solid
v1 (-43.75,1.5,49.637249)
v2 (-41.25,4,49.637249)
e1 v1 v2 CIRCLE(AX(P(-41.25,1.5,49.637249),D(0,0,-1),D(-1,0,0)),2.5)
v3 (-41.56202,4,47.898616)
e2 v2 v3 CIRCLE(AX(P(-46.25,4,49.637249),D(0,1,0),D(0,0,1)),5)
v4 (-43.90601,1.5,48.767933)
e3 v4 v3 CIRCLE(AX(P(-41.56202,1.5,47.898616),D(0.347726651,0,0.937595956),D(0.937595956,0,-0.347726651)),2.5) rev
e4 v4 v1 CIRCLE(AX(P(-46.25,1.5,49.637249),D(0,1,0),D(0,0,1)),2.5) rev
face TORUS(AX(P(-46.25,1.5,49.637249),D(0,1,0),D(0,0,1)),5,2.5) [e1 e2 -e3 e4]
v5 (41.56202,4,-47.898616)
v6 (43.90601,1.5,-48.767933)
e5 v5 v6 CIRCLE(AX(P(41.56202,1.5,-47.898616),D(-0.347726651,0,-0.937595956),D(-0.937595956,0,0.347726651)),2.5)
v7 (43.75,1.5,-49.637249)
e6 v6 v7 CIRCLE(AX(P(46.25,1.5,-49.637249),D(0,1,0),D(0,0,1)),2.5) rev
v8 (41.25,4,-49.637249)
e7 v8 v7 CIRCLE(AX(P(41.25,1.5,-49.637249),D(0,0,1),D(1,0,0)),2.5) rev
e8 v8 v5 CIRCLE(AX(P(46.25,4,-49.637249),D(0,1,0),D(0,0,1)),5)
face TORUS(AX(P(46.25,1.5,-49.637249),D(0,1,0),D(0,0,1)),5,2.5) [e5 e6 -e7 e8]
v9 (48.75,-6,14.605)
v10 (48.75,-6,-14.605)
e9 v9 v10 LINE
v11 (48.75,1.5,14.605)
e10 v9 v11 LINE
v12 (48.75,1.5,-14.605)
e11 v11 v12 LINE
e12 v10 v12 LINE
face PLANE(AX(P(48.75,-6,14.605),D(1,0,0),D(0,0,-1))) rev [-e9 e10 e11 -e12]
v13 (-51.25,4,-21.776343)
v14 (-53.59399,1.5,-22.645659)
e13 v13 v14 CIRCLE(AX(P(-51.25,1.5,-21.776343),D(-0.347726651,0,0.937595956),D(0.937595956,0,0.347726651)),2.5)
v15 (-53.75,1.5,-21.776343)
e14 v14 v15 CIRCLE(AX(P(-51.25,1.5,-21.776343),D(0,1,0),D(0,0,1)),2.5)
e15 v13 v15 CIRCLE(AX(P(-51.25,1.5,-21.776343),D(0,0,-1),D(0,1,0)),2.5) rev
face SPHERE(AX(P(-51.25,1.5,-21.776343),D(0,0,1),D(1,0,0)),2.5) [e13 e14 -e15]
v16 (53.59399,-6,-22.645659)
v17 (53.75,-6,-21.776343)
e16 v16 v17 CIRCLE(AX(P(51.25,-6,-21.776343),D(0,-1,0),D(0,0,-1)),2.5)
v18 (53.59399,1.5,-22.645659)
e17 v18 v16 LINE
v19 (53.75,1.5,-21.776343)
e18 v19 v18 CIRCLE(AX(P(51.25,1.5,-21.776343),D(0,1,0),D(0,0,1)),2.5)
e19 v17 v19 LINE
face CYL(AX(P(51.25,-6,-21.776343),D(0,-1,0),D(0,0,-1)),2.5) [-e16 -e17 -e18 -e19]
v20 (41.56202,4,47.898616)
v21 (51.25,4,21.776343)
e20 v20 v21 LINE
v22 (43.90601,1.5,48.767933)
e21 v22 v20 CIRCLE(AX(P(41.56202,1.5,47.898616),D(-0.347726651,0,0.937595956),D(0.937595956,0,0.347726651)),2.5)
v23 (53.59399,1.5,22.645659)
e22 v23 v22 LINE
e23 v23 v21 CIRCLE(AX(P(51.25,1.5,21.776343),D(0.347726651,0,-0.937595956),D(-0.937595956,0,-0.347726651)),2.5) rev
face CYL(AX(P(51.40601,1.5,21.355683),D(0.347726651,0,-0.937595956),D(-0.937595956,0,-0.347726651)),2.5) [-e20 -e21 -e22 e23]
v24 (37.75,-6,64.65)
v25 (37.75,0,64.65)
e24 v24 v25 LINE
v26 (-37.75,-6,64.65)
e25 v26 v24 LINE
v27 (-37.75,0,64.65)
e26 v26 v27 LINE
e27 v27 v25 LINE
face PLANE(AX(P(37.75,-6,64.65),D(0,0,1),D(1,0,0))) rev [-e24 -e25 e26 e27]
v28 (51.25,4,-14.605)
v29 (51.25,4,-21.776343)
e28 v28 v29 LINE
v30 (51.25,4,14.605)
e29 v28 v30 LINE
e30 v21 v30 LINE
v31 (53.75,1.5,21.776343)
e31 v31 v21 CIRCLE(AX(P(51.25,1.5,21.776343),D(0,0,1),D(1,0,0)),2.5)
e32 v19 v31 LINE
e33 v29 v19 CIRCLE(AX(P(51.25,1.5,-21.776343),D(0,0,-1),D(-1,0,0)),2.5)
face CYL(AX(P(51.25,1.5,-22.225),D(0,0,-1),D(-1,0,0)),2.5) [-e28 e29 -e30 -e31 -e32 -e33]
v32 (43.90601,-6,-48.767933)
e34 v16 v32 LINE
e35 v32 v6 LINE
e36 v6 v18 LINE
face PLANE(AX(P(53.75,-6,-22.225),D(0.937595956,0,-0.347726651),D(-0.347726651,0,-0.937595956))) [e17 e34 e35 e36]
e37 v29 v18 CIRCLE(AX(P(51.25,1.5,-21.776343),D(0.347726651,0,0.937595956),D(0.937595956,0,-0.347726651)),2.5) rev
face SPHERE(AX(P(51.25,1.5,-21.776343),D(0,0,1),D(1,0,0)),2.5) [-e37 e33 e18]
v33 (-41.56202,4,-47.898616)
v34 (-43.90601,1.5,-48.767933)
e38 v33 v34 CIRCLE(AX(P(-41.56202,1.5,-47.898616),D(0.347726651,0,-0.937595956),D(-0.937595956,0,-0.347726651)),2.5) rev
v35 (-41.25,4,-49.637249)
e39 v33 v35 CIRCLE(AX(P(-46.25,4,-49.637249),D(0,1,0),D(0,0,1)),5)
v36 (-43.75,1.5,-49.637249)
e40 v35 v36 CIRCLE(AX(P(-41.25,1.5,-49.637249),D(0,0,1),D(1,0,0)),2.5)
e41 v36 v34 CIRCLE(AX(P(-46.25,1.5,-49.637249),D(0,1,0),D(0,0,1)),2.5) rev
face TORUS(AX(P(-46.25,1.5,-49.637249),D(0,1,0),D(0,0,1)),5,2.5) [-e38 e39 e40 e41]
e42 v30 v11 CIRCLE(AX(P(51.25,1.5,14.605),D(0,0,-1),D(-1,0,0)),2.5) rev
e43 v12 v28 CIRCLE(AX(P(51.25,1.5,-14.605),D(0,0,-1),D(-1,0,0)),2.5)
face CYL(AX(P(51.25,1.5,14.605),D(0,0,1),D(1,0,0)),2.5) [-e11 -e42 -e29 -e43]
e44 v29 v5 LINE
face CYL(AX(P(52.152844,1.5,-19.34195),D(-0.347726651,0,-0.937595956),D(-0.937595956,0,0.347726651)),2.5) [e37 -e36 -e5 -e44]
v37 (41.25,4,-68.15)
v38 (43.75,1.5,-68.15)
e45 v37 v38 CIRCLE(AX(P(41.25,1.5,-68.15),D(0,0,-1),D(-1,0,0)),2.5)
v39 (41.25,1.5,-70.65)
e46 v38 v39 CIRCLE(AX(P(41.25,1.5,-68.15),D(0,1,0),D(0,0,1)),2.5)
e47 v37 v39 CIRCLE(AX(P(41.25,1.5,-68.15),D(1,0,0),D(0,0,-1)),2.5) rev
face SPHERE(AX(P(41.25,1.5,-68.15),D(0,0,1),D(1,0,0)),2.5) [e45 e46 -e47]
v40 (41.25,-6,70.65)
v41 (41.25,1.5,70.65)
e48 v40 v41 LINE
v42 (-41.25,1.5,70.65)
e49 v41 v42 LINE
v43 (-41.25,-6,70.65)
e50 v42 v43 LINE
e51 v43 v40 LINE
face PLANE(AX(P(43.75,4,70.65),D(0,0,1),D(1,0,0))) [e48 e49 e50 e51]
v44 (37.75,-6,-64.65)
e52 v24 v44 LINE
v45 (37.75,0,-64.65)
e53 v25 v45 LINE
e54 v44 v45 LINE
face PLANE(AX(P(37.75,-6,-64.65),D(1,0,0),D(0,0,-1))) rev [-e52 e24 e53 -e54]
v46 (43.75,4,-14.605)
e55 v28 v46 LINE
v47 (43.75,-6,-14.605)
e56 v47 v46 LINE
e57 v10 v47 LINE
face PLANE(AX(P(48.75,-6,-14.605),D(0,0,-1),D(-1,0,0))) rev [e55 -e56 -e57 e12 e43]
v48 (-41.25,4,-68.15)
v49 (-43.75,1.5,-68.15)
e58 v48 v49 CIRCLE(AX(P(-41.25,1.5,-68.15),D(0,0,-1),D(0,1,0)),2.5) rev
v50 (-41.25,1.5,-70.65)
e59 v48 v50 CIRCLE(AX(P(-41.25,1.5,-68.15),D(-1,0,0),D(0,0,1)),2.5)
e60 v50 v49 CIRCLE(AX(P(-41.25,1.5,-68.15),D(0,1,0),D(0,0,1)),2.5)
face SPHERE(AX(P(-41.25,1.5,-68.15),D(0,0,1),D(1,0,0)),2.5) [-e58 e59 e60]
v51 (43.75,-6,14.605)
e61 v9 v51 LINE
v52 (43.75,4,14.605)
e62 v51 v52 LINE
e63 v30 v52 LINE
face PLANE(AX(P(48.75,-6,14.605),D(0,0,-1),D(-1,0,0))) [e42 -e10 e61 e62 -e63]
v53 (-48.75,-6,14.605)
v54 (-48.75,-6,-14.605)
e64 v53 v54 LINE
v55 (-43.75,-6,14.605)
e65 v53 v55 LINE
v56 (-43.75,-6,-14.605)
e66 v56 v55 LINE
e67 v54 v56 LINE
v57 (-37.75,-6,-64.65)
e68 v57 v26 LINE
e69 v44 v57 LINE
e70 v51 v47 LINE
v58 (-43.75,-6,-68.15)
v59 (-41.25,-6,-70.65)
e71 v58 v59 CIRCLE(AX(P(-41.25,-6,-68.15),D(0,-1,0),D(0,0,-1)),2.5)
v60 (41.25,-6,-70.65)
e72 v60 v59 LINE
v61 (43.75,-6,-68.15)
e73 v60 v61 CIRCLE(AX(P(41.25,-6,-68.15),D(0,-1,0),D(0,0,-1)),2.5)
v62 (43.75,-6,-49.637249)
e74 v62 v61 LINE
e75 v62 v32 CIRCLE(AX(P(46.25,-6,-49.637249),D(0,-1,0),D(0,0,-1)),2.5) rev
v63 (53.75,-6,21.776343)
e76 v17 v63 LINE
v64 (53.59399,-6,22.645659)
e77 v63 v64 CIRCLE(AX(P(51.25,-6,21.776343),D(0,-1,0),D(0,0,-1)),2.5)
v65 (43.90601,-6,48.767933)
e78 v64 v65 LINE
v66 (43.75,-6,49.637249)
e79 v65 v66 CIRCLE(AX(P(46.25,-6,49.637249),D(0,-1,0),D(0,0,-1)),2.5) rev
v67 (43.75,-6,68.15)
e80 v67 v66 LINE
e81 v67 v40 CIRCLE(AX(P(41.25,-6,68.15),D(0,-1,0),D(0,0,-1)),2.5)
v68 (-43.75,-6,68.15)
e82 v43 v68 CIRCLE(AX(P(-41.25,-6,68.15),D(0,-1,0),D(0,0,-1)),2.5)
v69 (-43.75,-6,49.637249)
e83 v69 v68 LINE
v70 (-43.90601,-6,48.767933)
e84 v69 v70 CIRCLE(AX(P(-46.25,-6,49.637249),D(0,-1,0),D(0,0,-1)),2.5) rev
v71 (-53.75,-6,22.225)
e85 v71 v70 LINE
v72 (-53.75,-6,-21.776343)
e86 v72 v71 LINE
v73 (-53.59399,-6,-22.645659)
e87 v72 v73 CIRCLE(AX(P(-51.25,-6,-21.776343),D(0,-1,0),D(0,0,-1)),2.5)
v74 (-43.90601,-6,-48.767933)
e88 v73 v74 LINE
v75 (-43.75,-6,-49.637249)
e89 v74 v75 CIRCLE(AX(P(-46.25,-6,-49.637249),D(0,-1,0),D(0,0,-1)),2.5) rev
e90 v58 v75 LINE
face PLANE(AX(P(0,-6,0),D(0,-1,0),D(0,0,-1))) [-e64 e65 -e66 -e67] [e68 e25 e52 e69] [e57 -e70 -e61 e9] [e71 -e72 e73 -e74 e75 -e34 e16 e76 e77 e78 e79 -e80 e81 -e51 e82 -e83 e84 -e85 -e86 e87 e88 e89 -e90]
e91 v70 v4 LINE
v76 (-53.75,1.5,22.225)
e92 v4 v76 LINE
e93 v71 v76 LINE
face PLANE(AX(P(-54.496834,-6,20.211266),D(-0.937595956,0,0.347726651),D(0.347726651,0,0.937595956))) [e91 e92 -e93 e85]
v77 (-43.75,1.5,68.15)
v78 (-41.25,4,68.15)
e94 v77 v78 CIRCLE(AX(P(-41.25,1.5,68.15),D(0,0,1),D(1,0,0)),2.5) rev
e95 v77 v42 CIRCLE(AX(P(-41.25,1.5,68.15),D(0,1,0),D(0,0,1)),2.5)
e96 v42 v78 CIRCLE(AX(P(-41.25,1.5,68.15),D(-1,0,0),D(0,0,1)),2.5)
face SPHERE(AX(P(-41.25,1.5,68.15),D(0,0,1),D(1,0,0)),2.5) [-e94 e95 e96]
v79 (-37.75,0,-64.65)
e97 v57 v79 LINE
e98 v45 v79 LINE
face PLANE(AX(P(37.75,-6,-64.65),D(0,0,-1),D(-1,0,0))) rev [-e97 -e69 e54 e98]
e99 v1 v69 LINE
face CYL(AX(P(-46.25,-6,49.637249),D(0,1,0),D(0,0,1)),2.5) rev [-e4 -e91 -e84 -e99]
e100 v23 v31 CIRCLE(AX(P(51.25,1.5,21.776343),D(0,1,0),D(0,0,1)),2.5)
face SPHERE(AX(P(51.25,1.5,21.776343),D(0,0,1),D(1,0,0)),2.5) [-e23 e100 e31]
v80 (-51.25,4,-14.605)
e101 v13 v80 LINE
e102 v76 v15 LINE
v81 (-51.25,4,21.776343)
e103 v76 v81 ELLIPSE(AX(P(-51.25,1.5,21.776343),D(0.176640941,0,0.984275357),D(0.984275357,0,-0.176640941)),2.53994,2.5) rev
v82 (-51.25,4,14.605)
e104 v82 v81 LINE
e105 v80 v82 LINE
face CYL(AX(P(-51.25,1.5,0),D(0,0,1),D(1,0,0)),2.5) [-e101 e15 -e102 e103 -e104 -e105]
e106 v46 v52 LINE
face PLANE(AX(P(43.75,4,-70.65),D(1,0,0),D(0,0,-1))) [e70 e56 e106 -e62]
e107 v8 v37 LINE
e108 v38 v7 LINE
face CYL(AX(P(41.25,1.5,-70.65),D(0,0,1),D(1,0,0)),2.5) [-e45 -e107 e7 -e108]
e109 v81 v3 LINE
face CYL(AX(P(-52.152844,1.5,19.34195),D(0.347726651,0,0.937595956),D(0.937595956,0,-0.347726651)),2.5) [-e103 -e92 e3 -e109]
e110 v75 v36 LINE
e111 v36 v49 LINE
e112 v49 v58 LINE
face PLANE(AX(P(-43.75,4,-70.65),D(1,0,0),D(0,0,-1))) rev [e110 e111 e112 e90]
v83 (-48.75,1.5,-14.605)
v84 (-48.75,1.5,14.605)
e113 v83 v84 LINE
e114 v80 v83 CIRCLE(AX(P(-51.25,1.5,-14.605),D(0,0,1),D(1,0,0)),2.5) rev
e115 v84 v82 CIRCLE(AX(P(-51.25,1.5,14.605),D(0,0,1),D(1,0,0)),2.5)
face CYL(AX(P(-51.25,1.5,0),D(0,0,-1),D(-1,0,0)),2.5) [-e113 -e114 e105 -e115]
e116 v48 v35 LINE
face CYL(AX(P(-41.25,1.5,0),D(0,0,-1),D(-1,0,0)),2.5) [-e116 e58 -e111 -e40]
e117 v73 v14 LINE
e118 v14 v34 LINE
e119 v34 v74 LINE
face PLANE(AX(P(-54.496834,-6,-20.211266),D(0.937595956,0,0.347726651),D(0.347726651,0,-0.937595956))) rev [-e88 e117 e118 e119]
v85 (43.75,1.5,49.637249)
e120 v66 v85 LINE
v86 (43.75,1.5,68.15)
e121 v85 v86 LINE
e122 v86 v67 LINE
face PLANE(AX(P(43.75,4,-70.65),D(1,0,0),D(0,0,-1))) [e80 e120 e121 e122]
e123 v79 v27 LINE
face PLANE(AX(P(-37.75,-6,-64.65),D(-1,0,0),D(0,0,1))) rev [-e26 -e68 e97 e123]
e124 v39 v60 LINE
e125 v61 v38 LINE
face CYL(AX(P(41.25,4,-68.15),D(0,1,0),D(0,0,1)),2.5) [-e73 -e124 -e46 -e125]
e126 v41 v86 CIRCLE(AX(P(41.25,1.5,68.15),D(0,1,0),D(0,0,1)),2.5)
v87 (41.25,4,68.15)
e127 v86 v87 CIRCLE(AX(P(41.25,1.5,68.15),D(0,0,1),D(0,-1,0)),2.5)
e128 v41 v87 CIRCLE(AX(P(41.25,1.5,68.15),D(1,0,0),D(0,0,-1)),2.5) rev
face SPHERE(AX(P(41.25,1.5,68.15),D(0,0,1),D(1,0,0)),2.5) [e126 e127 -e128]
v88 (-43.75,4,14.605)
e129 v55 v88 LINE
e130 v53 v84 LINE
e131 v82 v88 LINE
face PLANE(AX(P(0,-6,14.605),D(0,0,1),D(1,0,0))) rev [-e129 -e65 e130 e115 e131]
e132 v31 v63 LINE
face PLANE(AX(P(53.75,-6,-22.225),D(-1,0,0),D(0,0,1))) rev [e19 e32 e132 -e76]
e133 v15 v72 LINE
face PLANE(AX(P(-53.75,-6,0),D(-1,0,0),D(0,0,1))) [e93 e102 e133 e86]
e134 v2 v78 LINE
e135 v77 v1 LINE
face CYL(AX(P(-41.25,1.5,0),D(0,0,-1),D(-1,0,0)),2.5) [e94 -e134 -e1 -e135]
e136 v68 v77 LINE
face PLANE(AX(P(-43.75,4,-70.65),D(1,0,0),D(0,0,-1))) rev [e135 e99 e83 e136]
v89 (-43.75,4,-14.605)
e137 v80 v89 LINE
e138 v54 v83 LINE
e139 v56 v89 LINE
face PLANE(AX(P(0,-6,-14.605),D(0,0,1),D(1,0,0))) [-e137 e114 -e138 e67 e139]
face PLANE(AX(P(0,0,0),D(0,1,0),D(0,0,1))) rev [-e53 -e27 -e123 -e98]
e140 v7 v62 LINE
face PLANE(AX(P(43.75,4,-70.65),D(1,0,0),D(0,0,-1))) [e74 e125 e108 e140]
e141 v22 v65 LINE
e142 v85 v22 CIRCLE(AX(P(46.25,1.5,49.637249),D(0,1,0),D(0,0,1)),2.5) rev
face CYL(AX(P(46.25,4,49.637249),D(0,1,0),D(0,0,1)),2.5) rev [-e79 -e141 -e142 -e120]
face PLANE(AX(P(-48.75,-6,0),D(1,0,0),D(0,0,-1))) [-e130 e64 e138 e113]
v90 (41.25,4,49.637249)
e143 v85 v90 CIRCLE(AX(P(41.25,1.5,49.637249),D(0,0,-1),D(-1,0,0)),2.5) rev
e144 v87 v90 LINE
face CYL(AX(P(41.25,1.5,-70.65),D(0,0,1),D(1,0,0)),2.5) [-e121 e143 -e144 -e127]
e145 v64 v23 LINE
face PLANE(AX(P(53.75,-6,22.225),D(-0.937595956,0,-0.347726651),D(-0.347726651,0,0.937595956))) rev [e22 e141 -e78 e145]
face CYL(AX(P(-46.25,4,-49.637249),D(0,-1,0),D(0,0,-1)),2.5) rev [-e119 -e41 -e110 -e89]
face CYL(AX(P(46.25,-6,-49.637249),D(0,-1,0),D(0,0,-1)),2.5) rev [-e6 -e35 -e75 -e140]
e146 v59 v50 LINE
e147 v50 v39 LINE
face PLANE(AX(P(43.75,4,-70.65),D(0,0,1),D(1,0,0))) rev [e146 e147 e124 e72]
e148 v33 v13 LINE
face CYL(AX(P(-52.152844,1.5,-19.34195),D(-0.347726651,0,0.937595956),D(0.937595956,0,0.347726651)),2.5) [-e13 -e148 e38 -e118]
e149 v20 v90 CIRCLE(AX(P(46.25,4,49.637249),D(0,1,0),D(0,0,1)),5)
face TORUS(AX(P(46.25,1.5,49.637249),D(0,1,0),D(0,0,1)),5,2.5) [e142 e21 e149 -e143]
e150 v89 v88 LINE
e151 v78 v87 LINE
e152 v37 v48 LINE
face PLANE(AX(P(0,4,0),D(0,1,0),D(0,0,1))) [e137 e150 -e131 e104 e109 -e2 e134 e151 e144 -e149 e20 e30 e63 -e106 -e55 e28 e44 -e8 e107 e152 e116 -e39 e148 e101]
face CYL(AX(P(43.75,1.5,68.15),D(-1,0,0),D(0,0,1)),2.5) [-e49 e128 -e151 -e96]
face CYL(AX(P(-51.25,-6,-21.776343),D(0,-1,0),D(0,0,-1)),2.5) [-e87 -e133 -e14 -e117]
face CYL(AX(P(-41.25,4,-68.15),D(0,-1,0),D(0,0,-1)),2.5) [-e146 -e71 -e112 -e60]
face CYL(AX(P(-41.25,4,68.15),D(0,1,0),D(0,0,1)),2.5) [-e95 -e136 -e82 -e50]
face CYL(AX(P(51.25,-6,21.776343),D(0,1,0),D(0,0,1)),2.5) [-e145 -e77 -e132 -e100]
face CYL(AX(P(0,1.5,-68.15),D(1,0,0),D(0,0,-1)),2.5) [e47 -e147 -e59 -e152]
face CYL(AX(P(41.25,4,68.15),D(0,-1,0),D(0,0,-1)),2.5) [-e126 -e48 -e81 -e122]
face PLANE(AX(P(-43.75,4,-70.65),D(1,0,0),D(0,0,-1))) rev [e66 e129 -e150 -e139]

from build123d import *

# Parameters (mm, degrees)
SKETCH1_W           = 87.5
SKETCH1_H           = 141.3
BOSS_EXTRUDE1_DEPTH = 4
SKETCH1_3_W         = 87.5
SKETCH1_3_H         = 141.3
SKETCH1_3_W_2       = 75.5
SKETCH1_3_H_2       = 129.3
BOSS_EXTRUDE2_DEPTH = 6
BOSS_EXTRUDE3_DEPTH = 10
FILLET2_R           = 2.5


with BuildPart() as part:
    # Sketch1 → Boss-Extrude1 (new body)
    with BuildSketch(Plane(origin=(0, 0, 0), x_dir=(1, 0, 0), z_dir=(0, 1, 0))):
        Rectangle(SKETCH1_W, SKETCH1_H)
    extrude(amount=BOSS_EXTRUDE1_DEPTH)

    # Sketch1<3> → Boss-Extrude2 (add)
    with BuildSketch(Plane(origin=(0, 0, 0), x_dir=(1, 0, 0), z_dir=(0, 1, 0))):
        Rectangle(SKETCH1_3_W, SKETCH1_3_H)
        Rectangle(SKETCH1_3_W_2, SKETCH1_3_H_2, mode=Mode.SUBTRACT)
    extrude(amount=-BOSS_EXTRUDE2_DEPTH)

    # Sketch2 → Boss-Extrude3 (add)
    with BuildSketch(Plane(origin=(0, 4, 0), x_dir=(1, 0, 0), z_dir=(0, 1, 0))):
        Polygon((-43.75, 49.188592066), (-53.75, 22.225), (-53.75, -22.225), (-43.75, -49.188592066), (-43.75, -22.225), (-43.75, -14.605), (-48.75, -14.605), (-48.75, 14.605), (-43.75, 14.605), (-43.75, 22.225), align=None)
        Polygon((53.75, 22.225), (43.75, 22.225), (43.75, 14.605), (48.75, 14.605), (48.75, -14.605), (43.75, -14.605), (43.75, -22.225), (43.75, -49.188592066), (53.75, -22.225), align=None)
        Polygon((43.75, 49.188592066), (43.75, 22.225), (53.75, 22.225), align=None)
    extrude(amount=-BOSS_EXTRUDE3_DEPTH)

    # Fillet2
    fillet2_edges = [part.edges().sort_by_distance(p)[0] for p in [
        (0, 4, 70.65),
        (43.75, 4, -59.919296033),
        (-43.75, 4, 59.919296033),
        (0, 4, -70.65),
        (-48.75, 4, -35.706796033),
        (-53.75, -1, -22.225),
        (-43.75, -1, -49.188592066),
        (-43.75, -1, 49.188592066),
        (-53.75, 4, 0),
        (-48.75, 4, 35.706796033),
        (-48.75, 4, 0),
        (43.75, 4, 59.919296033),
        (43.75, -1, -49.188592066),
        (53.75, 4, 0),
        (53.75, -1, -22.225),
        (48.75, 4, 35.706796033),
        (53.75, -1, 22.225),
        (43.75, -1, 49.188592066),
        (48.75, 4, 0),
        (-43.75, 4, -59.919296033),
        (48.75, 4, -35.706796033),
        (43.75, -1, -70.65),
        (43.75, -1, 70.65),
        (-43.75, -1, 70.65),
        (-43.75, -1, -70.65),
    ]]
    fillet(fillet2_edges, radius=FILLET2_R - 0.0001)  # a hair under: the kernel refuses the full size


solid = part.part
